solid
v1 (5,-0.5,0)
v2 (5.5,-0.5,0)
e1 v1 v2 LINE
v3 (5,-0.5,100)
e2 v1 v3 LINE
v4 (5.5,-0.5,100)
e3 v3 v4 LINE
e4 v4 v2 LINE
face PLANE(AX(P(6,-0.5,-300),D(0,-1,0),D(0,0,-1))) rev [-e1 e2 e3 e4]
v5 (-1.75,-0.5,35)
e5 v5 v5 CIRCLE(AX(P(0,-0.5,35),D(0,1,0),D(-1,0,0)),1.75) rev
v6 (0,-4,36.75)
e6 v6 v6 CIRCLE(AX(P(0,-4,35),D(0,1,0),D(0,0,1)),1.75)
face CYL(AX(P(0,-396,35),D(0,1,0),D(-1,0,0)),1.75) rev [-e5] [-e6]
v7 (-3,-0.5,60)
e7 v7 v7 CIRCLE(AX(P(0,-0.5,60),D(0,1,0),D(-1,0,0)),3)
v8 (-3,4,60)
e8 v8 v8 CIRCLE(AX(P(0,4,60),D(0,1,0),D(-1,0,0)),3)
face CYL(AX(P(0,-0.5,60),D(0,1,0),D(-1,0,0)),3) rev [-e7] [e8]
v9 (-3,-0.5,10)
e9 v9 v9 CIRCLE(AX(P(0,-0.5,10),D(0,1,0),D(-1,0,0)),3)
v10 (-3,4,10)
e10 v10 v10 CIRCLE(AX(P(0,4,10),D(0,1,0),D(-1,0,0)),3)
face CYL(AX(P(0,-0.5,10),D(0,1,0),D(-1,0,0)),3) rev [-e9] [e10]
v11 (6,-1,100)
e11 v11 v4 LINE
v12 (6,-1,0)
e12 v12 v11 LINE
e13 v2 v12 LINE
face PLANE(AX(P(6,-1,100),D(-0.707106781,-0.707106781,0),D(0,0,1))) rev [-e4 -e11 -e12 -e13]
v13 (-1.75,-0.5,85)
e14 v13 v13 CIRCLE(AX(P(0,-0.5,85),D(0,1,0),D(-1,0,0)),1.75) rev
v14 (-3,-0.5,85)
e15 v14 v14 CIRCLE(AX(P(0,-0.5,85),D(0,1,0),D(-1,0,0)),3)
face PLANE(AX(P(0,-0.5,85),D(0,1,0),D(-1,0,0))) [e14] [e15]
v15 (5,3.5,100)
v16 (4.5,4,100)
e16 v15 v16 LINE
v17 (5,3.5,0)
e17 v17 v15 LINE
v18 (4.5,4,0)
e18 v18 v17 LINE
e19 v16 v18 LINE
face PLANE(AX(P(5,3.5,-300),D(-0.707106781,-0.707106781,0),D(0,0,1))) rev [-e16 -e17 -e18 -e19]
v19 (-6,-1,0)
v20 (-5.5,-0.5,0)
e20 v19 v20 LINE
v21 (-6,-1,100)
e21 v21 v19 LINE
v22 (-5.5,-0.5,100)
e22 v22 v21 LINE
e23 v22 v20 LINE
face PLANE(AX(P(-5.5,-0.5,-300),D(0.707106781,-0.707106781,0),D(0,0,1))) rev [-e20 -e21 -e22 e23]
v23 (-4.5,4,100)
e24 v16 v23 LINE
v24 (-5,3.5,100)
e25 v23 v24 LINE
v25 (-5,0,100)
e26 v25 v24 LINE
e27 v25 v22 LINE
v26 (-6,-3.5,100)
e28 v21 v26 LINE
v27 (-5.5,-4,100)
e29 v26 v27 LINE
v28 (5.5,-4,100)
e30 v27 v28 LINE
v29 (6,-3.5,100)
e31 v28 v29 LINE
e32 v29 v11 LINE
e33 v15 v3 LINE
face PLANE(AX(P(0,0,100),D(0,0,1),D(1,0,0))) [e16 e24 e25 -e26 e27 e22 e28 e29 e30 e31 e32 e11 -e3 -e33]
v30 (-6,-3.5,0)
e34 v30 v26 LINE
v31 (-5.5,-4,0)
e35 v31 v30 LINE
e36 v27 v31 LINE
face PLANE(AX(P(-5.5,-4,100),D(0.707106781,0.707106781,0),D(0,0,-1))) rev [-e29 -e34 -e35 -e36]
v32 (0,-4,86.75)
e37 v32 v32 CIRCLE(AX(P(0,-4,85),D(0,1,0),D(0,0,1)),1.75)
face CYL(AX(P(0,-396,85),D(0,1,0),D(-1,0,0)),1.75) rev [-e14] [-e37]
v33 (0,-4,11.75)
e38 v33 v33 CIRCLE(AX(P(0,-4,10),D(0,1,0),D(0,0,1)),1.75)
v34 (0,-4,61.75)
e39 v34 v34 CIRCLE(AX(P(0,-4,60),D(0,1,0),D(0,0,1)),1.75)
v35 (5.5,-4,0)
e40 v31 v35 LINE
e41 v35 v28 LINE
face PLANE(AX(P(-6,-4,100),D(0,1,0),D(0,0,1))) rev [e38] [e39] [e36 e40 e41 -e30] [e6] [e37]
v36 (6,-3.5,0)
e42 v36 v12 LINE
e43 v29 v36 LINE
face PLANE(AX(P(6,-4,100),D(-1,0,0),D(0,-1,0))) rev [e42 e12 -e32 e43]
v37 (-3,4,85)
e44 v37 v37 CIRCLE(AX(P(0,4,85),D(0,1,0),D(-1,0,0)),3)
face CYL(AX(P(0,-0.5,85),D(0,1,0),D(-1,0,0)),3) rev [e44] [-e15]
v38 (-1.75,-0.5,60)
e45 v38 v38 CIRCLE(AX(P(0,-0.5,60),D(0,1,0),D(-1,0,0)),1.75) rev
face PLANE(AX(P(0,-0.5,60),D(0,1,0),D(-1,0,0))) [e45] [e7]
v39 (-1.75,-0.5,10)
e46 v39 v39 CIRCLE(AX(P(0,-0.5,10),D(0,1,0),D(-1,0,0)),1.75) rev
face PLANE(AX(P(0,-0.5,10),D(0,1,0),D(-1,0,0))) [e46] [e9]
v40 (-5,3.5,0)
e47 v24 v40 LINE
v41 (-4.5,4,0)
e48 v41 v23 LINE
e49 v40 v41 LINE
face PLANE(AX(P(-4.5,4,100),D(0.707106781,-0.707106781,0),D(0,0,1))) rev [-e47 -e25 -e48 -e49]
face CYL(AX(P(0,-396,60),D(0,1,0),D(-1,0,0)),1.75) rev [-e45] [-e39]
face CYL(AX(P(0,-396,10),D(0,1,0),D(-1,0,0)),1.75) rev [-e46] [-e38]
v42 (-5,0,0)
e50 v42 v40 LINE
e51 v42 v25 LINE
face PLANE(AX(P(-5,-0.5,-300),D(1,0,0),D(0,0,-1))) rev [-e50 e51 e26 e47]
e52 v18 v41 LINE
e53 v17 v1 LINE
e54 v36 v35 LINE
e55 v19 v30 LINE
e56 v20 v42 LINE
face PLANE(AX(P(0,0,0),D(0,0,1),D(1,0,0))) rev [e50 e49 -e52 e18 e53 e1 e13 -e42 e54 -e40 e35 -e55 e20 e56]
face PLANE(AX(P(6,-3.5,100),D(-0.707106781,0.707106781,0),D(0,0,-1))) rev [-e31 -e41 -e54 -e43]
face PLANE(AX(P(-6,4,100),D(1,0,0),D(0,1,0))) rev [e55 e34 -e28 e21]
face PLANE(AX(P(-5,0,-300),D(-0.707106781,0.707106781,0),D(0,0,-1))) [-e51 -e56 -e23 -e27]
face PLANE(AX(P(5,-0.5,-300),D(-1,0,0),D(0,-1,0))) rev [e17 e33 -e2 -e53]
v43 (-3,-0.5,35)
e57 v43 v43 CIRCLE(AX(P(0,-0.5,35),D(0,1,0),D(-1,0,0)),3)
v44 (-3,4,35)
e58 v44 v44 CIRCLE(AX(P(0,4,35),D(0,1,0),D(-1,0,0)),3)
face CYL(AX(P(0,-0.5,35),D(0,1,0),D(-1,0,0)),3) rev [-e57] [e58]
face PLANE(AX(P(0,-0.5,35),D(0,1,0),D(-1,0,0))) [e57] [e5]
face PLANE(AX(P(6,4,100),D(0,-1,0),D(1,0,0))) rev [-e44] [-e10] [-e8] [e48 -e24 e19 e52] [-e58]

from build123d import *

# Parameters (mm, degrees)
SKETCH_1_W          = 12
SKETCH_1_H          = 8
EXTRUDE_1_DEPTH     = 100
SKETCH_2_W          = 1
SKETCH_2_H          = 4.5
CUT_EXTRUDE_1_DEPTH = 400
CHAMFER_1_SIZE      = 0.5
SKETCH_3_R          = 1.75
CUT_EXTRUDE_2_DEPTH = 400
SKETCH_4_R          = 3
CUT_EXTRUDE_3_DEPTH = 4.5


with BuildPart() as part:
    # 草图1 → 凸台-拉伸1 (new body)
    with BuildSketch(Plane.XY):
        Rectangle(SKETCH_1_W, SKETCH_1_H)
    extrude(amount=EXTRUDE_1_DEPTH)

    # 草图2 → 切除-拉伸1 (cut)
    with BuildSketch(Plane.XY.offset(100)):
        with Locations((-5.5, 1.75)):
            Rectangle(SKETCH_2_W, SKETCH_2_H)
        with Locations((5.5, 1.75)):
            Rectangle(SKETCH_2_W, SKETCH_2_H)
    extrude(amount=-CUT_EXTRUDE_1_DEPTH, mode=Mode.SUBTRACT)

    # 倒角1
    chamfer_1_edges = [part.edges().sort_by_distance(p)[0] for p in [
        (-5, 4, 50),
        (-5, -0.5, 50),
        (-6, -0.5, 50),
        (6, -0.5, 50),
        (5, 4, 50),
        (6, -4, 50),
        (-6, -4, 50),
    ]]
    chamfer(chamfer_1_edges, length=CHAMFER_1_SIZE - 0.0001)  # a hair under: the kernel refuses the full size

    # 草图3 → 切除-拉伸2 (cut)
    with BuildSketch(Plane(origin=(0, 4, 0), x_dir=(1, 0, 0), z_dir=(0, 1, 0))):
        with Locations(Location((0, -10, 0), (0, 0, 180))):
            Circle(SKETCH_3_R)
        with Locations(Location((0, -35, 0), (0, 0, 180))):
            Circle(SKETCH_3_R)
        with Locations(Location((0, -60, 0), (0, 0, 180))):
            Circle(SKETCH_3_R)
        with Locations(Location((0, -85, 0), (0, 0, 180))):
            Circle(SKETCH_3_R)
        with Locations((0, -110)):
            Circle(SKETCH_3_R)
        with Locations((0, -135)):
            Circle(SKETCH_3_R)
        with Locations((0, -160)):
            Circle(SKETCH_3_R)
        with Locations((0, -185)):
            Circle(SKETCH_3_R)
        with Locations((0, -210)):
            Circle(SKETCH_3_R)
        with Locations((0, -235)):
            Circle(SKETCH_3_R)
        with Locations((0, -260)):
            Circle(SKETCH_3_R)
        with Locations((0, -285)):
            Circle(SKETCH_3_R)
        with Locations((0, -310)):
            Circle(SKETCH_3_R)
        with Locations((0, -335)):
            Circle(SKETCH_3_R)
        with Locations((0, -360)):
            Circle(SKETCH_3_R)
        with Locations((0, -385)):
            Circle(SKETCH_3_R)
    extrude(amount=-CUT_EXTRUDE_2_DEPTH, mode=Mode.SUBTRACT)

    # 草图4 → 切除-拉伸3 (cut)
    with BuildSketch(Plane(origin=(0, 4, 0), x_dir=(1, 0, 0), z_dir=(0, 1, 0))):
        with Locations(Location((0, -10, 0), (0, 0, 180))):
            Circle(SKETCH_4_R)
        with Locations(Location((0, -35, 0), (0, 0, 180))):
            Circle(SKETCH_4_R)
        with Locations(Location((0, -60, 0), (0, 0, 180))):
            Circle(SKETCH_4_R)
        with Locations(Location((0, -85, 0), (0, 0, 180))):
            Circle(SKETCH_4_R)
        with Locations((0, -110)):
            Circle(SKETCH_4_R)
        with Locations((0, -135)):
            Circle(SKETCH_4_R)
        with Locations((0, -160)):
            Circle(SKETCH_4_R)
        with Locations((0, -185)):
            Circle(SKETCH_4_R)
        with Locations((0, -210)):
            Circle(SKETCH_4_R)
        with Locations((0, -235)):
            Circle(SKETCH_4_R)
        with Locations((0, -260)):
            Circle(SKETCH_4_R)
        with Locations((0, -285)):
            Circle(SKETCH_4_R)
        with Locations((0, -310)):
            Circle(SKETCH_4_R)
        with Locations((0, -335)):
            Circle(SKETCH_4_R)
        with Locations((0, -360)):
            Circle(SKETCH_4_R)
        with Locations((0, -385)):
            Circle(SKETCH_4_R)
    extrude(amount=-CUT_EXTRUDE_3_DEPTH, mode=Mode.SUBTRACT)


solid = part.part
